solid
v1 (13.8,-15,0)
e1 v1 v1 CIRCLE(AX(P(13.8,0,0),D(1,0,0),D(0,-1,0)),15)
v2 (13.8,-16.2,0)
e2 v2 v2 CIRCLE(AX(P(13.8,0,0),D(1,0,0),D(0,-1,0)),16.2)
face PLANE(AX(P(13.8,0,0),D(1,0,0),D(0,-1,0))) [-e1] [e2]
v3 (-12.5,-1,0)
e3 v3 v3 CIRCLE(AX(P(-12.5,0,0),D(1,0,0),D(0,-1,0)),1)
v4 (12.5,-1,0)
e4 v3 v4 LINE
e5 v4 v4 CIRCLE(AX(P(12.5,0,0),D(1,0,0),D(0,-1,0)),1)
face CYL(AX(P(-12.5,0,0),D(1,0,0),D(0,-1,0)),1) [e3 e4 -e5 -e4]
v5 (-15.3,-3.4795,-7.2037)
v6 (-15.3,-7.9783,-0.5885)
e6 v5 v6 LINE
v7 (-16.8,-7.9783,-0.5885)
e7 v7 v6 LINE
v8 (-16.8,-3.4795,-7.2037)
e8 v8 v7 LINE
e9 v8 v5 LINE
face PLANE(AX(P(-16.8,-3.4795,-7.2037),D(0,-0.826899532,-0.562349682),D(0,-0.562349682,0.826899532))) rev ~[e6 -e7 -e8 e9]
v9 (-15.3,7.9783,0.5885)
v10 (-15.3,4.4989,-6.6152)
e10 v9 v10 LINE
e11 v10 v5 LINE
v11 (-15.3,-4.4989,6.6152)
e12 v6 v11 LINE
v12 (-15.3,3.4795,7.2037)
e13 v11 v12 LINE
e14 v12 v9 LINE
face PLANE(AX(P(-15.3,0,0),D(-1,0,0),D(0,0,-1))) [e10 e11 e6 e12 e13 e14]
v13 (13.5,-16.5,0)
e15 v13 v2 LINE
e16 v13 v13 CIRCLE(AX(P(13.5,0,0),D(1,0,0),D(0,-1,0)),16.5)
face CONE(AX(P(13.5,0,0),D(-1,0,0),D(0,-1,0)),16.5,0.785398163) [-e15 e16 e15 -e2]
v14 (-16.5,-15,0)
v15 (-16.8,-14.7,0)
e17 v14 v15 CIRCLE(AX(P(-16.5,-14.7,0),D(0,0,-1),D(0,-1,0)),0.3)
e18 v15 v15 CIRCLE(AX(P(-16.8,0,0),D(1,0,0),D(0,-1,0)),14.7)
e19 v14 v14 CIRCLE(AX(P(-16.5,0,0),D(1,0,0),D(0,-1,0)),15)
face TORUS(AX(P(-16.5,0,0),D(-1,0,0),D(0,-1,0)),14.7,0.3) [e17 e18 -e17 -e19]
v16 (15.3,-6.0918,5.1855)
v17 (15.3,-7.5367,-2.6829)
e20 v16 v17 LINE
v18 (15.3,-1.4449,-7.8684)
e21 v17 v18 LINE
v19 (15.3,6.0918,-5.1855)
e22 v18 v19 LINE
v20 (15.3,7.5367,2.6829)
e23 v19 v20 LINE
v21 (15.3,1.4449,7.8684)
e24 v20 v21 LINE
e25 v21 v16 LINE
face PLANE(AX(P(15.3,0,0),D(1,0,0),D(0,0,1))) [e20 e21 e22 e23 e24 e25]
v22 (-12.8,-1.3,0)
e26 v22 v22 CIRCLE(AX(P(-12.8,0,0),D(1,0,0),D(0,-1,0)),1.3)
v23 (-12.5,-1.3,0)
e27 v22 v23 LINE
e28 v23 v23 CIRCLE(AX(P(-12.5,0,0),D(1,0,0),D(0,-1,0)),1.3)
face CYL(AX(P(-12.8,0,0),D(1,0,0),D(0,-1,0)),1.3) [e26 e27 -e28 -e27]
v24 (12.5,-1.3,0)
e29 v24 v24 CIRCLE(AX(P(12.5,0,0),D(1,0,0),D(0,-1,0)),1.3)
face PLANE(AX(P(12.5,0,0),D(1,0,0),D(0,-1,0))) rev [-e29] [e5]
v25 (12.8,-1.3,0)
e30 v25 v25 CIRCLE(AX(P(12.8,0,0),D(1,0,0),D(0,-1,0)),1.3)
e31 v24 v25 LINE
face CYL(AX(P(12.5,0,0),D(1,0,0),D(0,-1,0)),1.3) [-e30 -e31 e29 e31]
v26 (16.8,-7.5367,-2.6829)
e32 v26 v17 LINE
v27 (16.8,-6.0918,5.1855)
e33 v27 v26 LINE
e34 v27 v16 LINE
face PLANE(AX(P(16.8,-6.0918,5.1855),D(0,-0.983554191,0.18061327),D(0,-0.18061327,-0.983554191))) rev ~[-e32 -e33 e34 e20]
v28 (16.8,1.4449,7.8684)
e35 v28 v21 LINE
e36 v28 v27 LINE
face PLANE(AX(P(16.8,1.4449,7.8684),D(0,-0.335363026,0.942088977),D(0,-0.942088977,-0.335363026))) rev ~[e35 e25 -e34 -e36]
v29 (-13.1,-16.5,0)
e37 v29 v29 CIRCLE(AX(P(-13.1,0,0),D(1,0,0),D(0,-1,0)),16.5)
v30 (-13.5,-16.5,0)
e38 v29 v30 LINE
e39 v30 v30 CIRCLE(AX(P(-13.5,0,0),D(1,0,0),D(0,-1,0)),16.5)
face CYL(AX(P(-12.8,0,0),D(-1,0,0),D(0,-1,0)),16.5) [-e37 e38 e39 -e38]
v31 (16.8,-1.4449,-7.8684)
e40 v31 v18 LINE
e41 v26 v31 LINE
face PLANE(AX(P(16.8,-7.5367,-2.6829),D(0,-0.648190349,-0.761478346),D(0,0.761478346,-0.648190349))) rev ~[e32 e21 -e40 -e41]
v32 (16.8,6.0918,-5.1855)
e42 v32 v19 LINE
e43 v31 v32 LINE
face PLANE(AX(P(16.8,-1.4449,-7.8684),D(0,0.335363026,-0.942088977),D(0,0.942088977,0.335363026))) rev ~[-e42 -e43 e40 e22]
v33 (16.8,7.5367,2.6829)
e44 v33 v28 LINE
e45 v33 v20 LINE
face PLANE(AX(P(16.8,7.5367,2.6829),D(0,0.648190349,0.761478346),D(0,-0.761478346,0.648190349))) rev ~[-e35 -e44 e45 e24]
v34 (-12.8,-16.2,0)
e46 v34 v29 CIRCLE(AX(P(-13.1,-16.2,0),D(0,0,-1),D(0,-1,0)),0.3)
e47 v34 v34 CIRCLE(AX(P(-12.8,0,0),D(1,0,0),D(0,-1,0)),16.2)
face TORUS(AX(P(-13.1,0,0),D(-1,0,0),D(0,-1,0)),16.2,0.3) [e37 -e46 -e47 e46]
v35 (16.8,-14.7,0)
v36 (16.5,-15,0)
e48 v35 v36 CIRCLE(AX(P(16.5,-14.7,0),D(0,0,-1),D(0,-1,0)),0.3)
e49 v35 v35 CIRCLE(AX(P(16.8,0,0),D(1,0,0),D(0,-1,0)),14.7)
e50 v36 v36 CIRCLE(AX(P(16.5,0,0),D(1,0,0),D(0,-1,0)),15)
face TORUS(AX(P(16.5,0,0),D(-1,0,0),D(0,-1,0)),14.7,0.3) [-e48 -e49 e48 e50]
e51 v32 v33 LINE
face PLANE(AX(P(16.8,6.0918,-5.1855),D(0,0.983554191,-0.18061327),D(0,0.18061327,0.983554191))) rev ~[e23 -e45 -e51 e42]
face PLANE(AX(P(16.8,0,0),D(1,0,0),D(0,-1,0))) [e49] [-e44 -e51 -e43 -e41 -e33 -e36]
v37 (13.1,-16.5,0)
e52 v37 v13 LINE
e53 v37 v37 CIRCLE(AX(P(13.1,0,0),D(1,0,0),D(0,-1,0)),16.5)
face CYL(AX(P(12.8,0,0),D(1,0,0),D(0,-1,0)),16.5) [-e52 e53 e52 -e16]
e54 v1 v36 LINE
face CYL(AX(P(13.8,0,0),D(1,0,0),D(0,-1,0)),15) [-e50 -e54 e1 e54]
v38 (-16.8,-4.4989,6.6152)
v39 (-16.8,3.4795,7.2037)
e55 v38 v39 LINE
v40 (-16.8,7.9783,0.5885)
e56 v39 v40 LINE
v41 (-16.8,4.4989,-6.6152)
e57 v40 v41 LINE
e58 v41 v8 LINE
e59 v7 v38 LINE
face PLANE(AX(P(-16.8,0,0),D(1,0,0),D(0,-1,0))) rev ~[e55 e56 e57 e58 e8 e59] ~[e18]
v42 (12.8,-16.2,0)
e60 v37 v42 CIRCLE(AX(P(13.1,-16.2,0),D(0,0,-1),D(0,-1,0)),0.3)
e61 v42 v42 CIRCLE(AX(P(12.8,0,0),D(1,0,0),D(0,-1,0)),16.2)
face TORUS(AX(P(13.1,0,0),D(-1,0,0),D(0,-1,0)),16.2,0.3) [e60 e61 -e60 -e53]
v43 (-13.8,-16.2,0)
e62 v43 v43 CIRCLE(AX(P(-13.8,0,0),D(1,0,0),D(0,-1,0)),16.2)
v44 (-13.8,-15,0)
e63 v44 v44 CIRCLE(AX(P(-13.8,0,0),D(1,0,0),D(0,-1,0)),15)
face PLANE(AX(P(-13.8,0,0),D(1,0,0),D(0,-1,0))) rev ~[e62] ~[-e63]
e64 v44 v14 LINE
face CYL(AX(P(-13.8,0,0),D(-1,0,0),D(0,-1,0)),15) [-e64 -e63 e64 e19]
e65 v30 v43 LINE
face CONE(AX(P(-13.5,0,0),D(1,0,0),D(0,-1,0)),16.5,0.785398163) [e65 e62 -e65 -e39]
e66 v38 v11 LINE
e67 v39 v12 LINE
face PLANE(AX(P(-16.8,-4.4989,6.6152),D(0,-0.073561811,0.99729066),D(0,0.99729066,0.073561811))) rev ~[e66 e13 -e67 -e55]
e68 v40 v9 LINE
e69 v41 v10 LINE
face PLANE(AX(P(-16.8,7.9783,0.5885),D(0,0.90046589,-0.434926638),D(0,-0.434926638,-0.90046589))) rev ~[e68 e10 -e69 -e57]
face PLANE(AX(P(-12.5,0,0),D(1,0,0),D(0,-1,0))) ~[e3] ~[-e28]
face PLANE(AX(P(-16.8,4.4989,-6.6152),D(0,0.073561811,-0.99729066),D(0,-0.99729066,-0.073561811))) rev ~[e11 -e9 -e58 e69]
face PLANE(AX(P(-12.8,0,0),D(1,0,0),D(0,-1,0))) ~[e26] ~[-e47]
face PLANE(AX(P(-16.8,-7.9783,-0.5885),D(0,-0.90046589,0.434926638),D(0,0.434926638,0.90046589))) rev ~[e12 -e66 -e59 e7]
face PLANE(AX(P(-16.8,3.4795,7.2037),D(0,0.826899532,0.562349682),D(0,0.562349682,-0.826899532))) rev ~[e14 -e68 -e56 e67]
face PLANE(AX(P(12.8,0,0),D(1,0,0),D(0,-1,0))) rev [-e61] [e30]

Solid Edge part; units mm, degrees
sketch "Sketch1" plane through (0, 0, 0) normal (0, 0, 1) x (1, 0, 0)
  line L0 (-12.8, -1.3) -> (-12.8, -16.5)
  line L1 (-12.8, -16.5) -> (-13.8, -16.5)
  line L2 (-13.8, -16.5) -> (-13.8, -15)
  line L3 (-13.8, -15) -> (-16.8, -15)
  line L4 (-16.8, -15) -> (-16.8, 0)
  line L5 (-16.8, 0) -> (16.8, 0)
  line L6 (16.8, -15) -> (16.8, 0)
  line L7 (13.8, -15) -> (16.8, -15)
  line L8 (13.8, -16.5) -> (13.8, -15)
  line L9 (12.8, -16.5) -> (13.8, -16.5)
  line L10 (12.8, -1.3) -> (12.8, -16.5)
  line L11 (12.5, -1.3) -> (12.8, -1.3)
  line L12 (12.5, -1) -> (12.5, -1.3)
  line L13 (-12.5, -1) -> (12.5, -1)
  line L14 (-12.5, -1) -> (-12.5, -1.3)
  line L15 (-12.8, -1.3) -> (-12.5, -1.3)
revolve "RevolvedProtrusion1" add sketch "Sketch1" angle 360 about axis through (-16.5, 0, 0) along (1, 0, 0)
fillet "Round1" radius 0.3 4 edges at (-16.8, 0, 15) (-12.8, 0, 16.5) (12.8, 0, 16.5) (16.8, 0, 15)
chamfer "Chamfer_1" distance 0.3 angle 45 2 edges at (-13.8, 0, 16.5) (13.8, 0, 16.5)
sketch "Sketch2" plane through (-16.8, 0, 0) normal (-1, 0, 0) x (0, -1, 0)
  line L0 (-7.9783, 0.5885) -> (-4.4989, -6.6152)
  line L1 (-4.4989, -6.6152) -> (3.4795, -7.2037)
  line L2 (3.4795, -7.2037) -> (7.9783, -0.5885)
  line L3 (7.9783, -0.5885) -> (4.4989, 6.6152)
  line L4 (4.4989, 6.6152) -> (-3.4795, 7.2037)
  line L5 (-3.4795, 7.2037) -> (-7.9783, 0.5885)
  dimension "D1" = 16
extrude "ExtrudedCutout_1" cut sketch "Sketch2" against normal blind 1.5
sketch "Sketch3" plane through (16.8, 0, 0) normal (1, 0, 0) x (0, 1, 0)
  line L0 (-6.0918, 5.1855) -> (-7.5367, -2.6829)
  line L1 (-7.5367, -2.6829) -> (-1.4449, -7.8684)
  line L2 (-1.4449, -7.8684) -> (6.0918, -5.1855)
  line L3 (6.0918, -5.1855) -> (7.5367, 2.6829)
  line L4 (7.5367, 2.6829) -> (1.4449, 7.8684)
  line L5 (1.4449, 7.8684) -> (-6.0918, 5.1855)
  dimension "D1" = 16
extrude "ExtrudedCutout_2" cut sketch "Sketch3" against normal blind 1.5
